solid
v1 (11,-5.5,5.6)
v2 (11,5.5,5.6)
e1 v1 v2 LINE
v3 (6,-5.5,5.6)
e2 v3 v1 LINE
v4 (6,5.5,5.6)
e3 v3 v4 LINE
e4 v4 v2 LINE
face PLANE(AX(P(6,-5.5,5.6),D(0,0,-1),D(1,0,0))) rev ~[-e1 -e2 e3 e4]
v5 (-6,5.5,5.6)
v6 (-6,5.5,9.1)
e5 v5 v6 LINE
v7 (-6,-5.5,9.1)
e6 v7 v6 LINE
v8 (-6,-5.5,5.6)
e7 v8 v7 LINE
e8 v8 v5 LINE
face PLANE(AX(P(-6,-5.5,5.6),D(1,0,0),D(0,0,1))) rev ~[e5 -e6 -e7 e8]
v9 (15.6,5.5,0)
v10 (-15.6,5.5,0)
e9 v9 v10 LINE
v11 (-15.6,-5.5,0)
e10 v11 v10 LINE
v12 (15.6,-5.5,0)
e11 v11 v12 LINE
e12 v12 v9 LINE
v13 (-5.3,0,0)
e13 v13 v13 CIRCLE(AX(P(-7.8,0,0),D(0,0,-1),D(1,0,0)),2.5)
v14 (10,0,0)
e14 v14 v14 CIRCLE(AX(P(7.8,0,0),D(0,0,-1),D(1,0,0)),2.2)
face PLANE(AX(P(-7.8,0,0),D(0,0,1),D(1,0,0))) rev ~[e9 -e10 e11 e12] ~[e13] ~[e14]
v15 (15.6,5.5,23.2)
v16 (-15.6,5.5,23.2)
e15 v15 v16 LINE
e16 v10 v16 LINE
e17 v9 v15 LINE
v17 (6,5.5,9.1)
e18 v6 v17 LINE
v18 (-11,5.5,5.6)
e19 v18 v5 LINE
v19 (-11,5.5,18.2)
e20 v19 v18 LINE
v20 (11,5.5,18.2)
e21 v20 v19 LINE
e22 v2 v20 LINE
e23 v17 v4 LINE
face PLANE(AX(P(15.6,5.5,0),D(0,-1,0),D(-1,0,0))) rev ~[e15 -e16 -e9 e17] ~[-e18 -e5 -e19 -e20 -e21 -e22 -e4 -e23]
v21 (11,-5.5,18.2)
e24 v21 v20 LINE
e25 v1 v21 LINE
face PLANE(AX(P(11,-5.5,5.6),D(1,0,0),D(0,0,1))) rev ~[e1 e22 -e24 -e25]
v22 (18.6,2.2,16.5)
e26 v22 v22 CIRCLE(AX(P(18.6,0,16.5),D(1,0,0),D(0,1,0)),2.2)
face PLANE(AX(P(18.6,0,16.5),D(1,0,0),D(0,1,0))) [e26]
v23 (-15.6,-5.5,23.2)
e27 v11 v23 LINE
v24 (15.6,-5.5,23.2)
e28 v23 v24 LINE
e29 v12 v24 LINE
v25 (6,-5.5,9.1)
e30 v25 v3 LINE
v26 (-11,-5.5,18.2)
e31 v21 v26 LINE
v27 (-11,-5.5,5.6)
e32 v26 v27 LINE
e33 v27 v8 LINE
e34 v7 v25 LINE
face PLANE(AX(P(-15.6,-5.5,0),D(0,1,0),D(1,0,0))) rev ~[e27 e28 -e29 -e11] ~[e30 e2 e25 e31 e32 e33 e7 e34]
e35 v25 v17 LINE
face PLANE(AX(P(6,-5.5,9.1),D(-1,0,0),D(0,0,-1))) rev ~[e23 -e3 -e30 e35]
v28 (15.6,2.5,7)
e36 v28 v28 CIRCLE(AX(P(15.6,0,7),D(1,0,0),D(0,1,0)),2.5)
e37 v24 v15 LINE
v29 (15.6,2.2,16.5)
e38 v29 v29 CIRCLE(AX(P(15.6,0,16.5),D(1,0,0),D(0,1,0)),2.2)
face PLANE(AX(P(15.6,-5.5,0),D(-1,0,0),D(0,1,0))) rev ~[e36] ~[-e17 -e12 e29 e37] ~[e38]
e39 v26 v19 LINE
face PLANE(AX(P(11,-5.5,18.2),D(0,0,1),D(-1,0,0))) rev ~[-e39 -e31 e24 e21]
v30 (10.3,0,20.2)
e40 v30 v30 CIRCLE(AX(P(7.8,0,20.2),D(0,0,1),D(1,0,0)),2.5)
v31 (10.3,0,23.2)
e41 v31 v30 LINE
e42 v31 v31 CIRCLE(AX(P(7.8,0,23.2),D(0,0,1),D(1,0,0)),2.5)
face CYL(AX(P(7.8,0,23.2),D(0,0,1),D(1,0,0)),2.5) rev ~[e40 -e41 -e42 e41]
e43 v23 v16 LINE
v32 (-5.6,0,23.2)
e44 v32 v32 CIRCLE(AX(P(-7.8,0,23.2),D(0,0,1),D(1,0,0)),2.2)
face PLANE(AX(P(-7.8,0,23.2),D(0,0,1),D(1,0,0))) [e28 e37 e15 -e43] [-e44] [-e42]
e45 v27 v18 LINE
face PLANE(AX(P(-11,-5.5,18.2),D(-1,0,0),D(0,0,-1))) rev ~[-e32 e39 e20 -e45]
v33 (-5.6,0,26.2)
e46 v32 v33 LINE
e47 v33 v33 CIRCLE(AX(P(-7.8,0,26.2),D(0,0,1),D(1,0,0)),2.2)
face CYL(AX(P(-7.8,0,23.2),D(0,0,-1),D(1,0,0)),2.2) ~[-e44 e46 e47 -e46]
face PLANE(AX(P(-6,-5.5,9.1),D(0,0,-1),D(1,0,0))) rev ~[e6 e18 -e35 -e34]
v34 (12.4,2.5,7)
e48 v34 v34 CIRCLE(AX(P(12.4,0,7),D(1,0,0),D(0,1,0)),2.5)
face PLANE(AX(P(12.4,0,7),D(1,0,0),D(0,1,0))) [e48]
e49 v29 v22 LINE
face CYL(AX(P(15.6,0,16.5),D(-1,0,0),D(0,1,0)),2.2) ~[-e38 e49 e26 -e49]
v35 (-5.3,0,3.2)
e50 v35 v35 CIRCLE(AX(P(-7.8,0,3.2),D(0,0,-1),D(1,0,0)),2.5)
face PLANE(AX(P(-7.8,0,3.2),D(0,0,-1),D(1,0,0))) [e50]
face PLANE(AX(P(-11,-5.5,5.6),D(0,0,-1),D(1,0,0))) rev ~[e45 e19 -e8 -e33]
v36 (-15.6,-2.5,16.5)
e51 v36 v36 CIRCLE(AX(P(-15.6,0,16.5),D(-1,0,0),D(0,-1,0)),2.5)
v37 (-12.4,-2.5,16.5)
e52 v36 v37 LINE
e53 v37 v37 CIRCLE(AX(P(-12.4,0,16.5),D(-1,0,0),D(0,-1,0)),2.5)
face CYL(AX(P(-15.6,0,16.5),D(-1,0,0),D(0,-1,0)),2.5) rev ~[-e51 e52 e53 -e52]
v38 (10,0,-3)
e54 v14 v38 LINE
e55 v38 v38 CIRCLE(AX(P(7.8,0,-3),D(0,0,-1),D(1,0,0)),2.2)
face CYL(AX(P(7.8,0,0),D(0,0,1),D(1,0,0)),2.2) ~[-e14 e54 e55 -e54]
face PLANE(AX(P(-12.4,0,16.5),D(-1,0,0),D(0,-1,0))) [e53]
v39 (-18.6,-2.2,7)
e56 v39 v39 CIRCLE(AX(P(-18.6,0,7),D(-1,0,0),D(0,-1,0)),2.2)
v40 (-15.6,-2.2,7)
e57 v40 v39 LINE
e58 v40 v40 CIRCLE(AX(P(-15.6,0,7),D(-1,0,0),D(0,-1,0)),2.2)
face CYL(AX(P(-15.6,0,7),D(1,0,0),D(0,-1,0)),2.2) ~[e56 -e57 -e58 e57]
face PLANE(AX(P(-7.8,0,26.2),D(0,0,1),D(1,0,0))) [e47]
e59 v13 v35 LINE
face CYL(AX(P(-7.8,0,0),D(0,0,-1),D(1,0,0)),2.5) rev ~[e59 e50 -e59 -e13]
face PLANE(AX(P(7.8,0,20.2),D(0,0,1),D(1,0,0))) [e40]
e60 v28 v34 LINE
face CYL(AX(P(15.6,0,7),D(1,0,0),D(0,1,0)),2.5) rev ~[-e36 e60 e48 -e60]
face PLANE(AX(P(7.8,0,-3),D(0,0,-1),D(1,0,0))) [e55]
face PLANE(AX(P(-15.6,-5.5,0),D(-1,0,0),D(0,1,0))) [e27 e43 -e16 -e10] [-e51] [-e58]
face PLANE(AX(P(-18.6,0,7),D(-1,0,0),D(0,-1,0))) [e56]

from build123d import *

# Parameters (mm, degrees)
F0_W      = 15.6
F0_H      = 11
F1_DEPTH  = 23.2
F3_DEPTH  = 25
F4_R      = 2.5
F5_DEPTH  = 3.2
F6_R      = 2.2
F7_DEPTH  = 3
F8_R      = 2.2
F9_DEPTH  = 3
F10_R     = 2.5
F11_DEPTH = 3
F13_R     = 2.2
F14_DEPTH = 3
F12_R     = 2.5
F15_DEPTH = 3.2
F16_R     = 2.5
F18_DEPTH = 3.2
F17_R     = 2.2
F19_DEPTH = 3


# Not quite as in the source:
# - a feature names something its author has since deleted; it is built from what else it names


with BuildPart() as f1:
    # F0 (on Top) → F1 (new body)
    with BuildSketch(Plane.XY):
        with Locations((-7.8, 0)):
            Rectangle(F0_W, F0_H)
        with Locations((7.8, 0)):
            Rectangle(F0_W, F0_H)
    extrude(amount=F1_DEPTH)

    # F2 (on face) → F3 (cut)
    with BuildSketch(Plane.XZ.offset(5.5)):
        Polygon((0, 18.2), (-11, 18.2), (-11, 5.6), (-6, 5.6), (-6, 9.1), (0, 9.1), (6, 9.1), (6, 5.6), (11, 5.6), (11, 18.2), align=None)
    extrude(amount=-F3_DEPTH, mode=Mode.SUBTRACT)

    # F4 (on face) → F5 (cut)
    with BuildSketch(Plane(origin=(0, 0, 0), x_dir=(1, 0, 0), z_dir=(0, 0, -1))):
        with Locations((-7.8, 0)):
            Circle(F4_R)
    extrude(amount=-F5_DEPTH, mode=Mode.SUBTRACT)

    # F6 (on face) → F7 (join)
    with BuildSketch(Plane(origin=(0, 0, 0), x_dir=(1, 0, 0), z_dir=(0, 0, -1))):
        with Locations((7.8, 0)):
            Circle(F6_R)
    extrude(amount=F7_DEPTH)

    # F8 (on face) → F9 (join)
    with BuildSketch(Plane.XY.offset(23.2)):
        with Locations((-7.8, 0)):
            Circle(F8_R)
    extrude(amount=F9_DEPTH)

    # F10 (on face) → F11 (cut)
    with BuildSketch(Plane.XY.offset(23.2)):
        with Locations((7.8, 0)):
            Circle(F10_R)
    extrude(amount=-F11_DEPTH, mode=Mode.SUBTRACT)

    # F13 (on face) → F14 (join)
    with BuildSketch(Plane.YZ.offset(15.6)):
        with Locations((0, 16.5)):
            Circle(F13_R)
    extrude(amount=F14_DEPTH)

    # F12 (on face) → F15 (cut)
    with BuildSketch(Plane.YZ.offset(15.6)):
        with Locations((0, 7)):
            Circle(F12_R)
    extrude(amount=-F15_DEPTH, mode=Mode.SUBTRACT)

    # F16 (on face) → F18 (cut)
    with BuildSketch(Plane(origin=(-15.6, 0, 0), x_dir=(0, -1, 0), z_dir=(-1, 0, 0))):
        with Locations((0, 16.5)):
            Circle(F16_R)
    extrude(amount=-F18_DEPTH, mode=Mode.SUBTRACT)

    # F17 (on face) → F19 (join)
    with BuildSketch(Plane(origin=(-15.6, 0, 0), x_dir=(0, -1, 0), z_dir=(-1, 0, 0))):
        with Locations((0, 7)):
            Circle(F17_R)
    extrude(amount=F19_DEPTH)


solid = f1.part
